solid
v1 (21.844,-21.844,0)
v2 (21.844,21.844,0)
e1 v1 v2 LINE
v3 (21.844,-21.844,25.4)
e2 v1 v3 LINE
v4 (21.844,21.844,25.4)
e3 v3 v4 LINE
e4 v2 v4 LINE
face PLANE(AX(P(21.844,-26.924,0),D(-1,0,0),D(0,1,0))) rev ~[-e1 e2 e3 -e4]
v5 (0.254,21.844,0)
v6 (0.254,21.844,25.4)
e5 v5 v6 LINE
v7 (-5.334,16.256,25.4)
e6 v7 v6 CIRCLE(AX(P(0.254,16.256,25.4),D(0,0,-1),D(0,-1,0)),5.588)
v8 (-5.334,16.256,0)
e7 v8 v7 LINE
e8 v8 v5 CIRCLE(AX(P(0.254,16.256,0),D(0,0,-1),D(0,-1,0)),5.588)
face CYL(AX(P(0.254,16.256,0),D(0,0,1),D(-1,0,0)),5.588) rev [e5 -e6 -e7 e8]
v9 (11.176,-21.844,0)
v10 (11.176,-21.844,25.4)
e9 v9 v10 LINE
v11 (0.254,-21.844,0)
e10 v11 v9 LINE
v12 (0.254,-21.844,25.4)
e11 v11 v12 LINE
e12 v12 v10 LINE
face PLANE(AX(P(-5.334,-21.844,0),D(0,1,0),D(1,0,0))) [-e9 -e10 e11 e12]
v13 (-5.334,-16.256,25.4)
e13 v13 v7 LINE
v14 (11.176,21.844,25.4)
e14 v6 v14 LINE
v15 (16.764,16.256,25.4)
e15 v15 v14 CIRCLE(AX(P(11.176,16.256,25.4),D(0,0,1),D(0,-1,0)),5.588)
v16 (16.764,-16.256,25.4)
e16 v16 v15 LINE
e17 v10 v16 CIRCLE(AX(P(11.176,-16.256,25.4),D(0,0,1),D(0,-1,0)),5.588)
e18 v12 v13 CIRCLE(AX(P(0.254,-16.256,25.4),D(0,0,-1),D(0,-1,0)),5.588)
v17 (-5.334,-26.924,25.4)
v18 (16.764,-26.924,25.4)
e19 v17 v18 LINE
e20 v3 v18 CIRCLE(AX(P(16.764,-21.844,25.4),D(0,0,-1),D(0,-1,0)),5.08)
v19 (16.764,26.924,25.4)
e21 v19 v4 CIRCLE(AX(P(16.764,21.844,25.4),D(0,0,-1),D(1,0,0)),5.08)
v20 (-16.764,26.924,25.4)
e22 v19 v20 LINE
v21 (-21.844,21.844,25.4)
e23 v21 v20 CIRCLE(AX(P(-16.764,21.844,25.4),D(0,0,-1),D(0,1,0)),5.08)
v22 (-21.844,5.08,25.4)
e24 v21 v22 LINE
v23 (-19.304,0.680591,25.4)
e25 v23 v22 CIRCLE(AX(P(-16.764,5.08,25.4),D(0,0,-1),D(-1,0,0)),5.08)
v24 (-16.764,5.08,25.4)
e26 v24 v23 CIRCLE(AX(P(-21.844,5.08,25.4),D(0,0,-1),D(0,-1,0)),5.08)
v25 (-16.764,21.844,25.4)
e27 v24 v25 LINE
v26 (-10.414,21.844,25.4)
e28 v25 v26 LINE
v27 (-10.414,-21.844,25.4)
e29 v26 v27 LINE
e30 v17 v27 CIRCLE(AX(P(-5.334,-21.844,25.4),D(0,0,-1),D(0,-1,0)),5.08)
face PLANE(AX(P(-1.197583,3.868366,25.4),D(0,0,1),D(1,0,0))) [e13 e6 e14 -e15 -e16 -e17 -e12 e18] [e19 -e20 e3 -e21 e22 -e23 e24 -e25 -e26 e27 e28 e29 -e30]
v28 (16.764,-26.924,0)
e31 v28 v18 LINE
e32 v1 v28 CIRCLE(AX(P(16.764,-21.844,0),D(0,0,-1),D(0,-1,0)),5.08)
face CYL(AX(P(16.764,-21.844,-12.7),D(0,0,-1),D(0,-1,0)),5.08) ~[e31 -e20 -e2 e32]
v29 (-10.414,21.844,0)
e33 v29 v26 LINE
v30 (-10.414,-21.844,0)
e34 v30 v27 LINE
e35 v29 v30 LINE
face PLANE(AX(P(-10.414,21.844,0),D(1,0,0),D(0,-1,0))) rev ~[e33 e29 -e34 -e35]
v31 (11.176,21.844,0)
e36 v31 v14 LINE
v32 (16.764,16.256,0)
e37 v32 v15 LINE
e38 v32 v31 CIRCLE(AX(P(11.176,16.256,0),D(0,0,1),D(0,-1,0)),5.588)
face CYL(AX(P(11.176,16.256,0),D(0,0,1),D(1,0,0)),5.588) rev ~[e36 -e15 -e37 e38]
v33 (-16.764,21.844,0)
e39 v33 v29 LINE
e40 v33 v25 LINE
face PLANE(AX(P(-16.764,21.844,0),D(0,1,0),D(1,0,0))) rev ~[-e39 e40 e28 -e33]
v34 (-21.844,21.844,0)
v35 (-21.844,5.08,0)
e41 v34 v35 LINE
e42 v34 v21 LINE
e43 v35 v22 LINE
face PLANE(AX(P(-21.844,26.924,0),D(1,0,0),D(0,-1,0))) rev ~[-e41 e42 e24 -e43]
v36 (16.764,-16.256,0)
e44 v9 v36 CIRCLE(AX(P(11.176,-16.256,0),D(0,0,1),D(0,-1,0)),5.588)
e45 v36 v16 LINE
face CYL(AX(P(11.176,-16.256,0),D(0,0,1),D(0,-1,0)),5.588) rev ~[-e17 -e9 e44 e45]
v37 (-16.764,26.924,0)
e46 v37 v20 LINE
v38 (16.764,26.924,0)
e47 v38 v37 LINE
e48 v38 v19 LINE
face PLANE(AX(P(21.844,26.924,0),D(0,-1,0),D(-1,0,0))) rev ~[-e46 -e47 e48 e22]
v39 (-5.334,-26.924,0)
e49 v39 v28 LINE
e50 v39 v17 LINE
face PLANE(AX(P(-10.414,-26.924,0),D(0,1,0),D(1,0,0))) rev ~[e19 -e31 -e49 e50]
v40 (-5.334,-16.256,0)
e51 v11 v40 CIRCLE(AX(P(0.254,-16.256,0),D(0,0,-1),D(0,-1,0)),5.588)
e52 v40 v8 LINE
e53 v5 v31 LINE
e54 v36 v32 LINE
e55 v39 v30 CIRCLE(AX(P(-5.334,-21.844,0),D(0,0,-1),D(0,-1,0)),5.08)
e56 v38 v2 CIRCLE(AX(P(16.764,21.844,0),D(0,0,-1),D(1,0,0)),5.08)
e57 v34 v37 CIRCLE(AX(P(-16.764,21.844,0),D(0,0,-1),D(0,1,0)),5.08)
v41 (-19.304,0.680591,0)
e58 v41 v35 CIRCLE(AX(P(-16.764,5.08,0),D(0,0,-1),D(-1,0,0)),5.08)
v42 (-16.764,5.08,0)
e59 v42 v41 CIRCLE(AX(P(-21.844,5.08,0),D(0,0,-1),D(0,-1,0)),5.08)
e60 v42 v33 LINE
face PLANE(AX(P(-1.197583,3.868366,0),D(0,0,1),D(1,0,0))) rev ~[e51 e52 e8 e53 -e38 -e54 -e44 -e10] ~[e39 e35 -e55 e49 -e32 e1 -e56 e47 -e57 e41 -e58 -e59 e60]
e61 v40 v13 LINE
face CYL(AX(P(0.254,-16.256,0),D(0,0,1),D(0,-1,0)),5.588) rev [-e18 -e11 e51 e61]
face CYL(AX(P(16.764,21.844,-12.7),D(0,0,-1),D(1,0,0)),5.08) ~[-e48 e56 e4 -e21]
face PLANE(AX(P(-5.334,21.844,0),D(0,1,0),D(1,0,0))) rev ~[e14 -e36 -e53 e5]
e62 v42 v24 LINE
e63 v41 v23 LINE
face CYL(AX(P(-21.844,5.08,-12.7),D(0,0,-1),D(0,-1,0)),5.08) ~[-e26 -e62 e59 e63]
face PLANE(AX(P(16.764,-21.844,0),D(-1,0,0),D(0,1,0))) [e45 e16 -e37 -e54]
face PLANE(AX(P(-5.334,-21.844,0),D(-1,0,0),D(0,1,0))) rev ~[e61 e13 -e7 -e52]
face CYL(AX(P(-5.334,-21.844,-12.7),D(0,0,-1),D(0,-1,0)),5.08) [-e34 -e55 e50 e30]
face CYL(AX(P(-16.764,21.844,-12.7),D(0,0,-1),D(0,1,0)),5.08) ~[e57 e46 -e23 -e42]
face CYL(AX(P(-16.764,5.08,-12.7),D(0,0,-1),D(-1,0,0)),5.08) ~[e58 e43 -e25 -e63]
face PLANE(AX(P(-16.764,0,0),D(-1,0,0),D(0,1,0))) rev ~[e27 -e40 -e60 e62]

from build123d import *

# Parameters (mm, degrees)
F0_W        = 22.098
F0_H        = 43.688
F1_DEPTH    = 25.4
F2_T1_DEPTH = 50.8
F3_R        = 5.588


# Not quite as in the source:
# - a fillet or chamfer that OpenCascade refuses, or shapes differently, is made with other operations: its cross-section is extruded or revolved along the edge and cut away or added


with BuildPart() as f1:
    # F0 (on Top) → F1 (new body)
    with BuildSketch(Plane.XY):
        Polygon((21.844, -26.924), (21.844, 26.924), (-21.844, 26.924), (-21.844, 0), (-16.764, 0), (-16.764, 21.844), (-10.414, 21.844), (-10.414, -26.924), align=None)
        with Locations((5.715, 0)):
            Rectangle(F0_W, F0_H, mode=Mode.SUBTRACT)
    extrude(amount=F1_DEPTH)

    # F2: fillet of radius 5.08 on 6 edges, made by hand

    # F2_s2 → F2_t1 (cut)
    with BuildSketch(Plane.XY.offset(-12.7)):
        with BuildLine():
            ThreePointArc((-16.764, 26.924), (-20.3561024484, 25.4361024484), (-21.844, 21.844))
            Line((-21.844, 21.844), (-21.844, 26.924))
            Line((-21.844, 26.924), (-16.764, 26.924))
        make_face()
        with BuildLine():
            ThreePointArc((21.844, 21.844), (20.3561024484, 25.4361024484), (16.764, 26.924))
            Line((16.764, 26.924), (21.844, 26.924))
            Line((21.844, 26.924), (21.844, 21.844))
        make_face()
        with BuildLine():
            ThreePointArc((-5.334, -26.924), (-8.9261024484, -25.4361024484), (-10.414, -21.844))
            Line((-10.414, -21.844), (-10.414, -26.924))
            Line((-10.414, -26.924), (-5.334, -26.924))
        make_face()
        with BuildLine():
            ThreePointArc((16.764, -26.924), (20.3561024484, -25.4361024484), (21.844, -21.844))
            Line((21.844, -21.844), (21.844, -26.924))
            Line((21.844, -26.924), (16.764, -26.924))
        make_face()
        with BuildLine():
            ThreePointArc((-21.844, 0), (-18.2518975516, 1.4878975516), (-16.764, 5.08))
            Line((-16.764, 5.08), (-16.764, 0))
            Line((-16.764, 0), (-21.844, 0))
        make_face()
        with BuildLine():
            ThreePointArc((-21.844, 5.08), (-20.3561024484, 1.4878975516), (-16.764, 0))
            Line((-16.764, 0), (-21.844, 0))
            Line((-21.844, 0), (-21.844, 5.08))
        make_face()
    extrude(amount=F2_T1_DEPTH, mode=Mode.SUBTRACT)

    # F3
    f3_edges = [f1.edges().sort_by_distance(p)[0] for p in [
        (-5.334, -21.844, 12.7),
        (16.764, -21.844, 12.7),
        (16.764, 21.844, 12.7),
        (-5.334, 21.844, 12.7),
    ]]
    fillet(f3_edges, radius=F3_R)


solid = f1.part
